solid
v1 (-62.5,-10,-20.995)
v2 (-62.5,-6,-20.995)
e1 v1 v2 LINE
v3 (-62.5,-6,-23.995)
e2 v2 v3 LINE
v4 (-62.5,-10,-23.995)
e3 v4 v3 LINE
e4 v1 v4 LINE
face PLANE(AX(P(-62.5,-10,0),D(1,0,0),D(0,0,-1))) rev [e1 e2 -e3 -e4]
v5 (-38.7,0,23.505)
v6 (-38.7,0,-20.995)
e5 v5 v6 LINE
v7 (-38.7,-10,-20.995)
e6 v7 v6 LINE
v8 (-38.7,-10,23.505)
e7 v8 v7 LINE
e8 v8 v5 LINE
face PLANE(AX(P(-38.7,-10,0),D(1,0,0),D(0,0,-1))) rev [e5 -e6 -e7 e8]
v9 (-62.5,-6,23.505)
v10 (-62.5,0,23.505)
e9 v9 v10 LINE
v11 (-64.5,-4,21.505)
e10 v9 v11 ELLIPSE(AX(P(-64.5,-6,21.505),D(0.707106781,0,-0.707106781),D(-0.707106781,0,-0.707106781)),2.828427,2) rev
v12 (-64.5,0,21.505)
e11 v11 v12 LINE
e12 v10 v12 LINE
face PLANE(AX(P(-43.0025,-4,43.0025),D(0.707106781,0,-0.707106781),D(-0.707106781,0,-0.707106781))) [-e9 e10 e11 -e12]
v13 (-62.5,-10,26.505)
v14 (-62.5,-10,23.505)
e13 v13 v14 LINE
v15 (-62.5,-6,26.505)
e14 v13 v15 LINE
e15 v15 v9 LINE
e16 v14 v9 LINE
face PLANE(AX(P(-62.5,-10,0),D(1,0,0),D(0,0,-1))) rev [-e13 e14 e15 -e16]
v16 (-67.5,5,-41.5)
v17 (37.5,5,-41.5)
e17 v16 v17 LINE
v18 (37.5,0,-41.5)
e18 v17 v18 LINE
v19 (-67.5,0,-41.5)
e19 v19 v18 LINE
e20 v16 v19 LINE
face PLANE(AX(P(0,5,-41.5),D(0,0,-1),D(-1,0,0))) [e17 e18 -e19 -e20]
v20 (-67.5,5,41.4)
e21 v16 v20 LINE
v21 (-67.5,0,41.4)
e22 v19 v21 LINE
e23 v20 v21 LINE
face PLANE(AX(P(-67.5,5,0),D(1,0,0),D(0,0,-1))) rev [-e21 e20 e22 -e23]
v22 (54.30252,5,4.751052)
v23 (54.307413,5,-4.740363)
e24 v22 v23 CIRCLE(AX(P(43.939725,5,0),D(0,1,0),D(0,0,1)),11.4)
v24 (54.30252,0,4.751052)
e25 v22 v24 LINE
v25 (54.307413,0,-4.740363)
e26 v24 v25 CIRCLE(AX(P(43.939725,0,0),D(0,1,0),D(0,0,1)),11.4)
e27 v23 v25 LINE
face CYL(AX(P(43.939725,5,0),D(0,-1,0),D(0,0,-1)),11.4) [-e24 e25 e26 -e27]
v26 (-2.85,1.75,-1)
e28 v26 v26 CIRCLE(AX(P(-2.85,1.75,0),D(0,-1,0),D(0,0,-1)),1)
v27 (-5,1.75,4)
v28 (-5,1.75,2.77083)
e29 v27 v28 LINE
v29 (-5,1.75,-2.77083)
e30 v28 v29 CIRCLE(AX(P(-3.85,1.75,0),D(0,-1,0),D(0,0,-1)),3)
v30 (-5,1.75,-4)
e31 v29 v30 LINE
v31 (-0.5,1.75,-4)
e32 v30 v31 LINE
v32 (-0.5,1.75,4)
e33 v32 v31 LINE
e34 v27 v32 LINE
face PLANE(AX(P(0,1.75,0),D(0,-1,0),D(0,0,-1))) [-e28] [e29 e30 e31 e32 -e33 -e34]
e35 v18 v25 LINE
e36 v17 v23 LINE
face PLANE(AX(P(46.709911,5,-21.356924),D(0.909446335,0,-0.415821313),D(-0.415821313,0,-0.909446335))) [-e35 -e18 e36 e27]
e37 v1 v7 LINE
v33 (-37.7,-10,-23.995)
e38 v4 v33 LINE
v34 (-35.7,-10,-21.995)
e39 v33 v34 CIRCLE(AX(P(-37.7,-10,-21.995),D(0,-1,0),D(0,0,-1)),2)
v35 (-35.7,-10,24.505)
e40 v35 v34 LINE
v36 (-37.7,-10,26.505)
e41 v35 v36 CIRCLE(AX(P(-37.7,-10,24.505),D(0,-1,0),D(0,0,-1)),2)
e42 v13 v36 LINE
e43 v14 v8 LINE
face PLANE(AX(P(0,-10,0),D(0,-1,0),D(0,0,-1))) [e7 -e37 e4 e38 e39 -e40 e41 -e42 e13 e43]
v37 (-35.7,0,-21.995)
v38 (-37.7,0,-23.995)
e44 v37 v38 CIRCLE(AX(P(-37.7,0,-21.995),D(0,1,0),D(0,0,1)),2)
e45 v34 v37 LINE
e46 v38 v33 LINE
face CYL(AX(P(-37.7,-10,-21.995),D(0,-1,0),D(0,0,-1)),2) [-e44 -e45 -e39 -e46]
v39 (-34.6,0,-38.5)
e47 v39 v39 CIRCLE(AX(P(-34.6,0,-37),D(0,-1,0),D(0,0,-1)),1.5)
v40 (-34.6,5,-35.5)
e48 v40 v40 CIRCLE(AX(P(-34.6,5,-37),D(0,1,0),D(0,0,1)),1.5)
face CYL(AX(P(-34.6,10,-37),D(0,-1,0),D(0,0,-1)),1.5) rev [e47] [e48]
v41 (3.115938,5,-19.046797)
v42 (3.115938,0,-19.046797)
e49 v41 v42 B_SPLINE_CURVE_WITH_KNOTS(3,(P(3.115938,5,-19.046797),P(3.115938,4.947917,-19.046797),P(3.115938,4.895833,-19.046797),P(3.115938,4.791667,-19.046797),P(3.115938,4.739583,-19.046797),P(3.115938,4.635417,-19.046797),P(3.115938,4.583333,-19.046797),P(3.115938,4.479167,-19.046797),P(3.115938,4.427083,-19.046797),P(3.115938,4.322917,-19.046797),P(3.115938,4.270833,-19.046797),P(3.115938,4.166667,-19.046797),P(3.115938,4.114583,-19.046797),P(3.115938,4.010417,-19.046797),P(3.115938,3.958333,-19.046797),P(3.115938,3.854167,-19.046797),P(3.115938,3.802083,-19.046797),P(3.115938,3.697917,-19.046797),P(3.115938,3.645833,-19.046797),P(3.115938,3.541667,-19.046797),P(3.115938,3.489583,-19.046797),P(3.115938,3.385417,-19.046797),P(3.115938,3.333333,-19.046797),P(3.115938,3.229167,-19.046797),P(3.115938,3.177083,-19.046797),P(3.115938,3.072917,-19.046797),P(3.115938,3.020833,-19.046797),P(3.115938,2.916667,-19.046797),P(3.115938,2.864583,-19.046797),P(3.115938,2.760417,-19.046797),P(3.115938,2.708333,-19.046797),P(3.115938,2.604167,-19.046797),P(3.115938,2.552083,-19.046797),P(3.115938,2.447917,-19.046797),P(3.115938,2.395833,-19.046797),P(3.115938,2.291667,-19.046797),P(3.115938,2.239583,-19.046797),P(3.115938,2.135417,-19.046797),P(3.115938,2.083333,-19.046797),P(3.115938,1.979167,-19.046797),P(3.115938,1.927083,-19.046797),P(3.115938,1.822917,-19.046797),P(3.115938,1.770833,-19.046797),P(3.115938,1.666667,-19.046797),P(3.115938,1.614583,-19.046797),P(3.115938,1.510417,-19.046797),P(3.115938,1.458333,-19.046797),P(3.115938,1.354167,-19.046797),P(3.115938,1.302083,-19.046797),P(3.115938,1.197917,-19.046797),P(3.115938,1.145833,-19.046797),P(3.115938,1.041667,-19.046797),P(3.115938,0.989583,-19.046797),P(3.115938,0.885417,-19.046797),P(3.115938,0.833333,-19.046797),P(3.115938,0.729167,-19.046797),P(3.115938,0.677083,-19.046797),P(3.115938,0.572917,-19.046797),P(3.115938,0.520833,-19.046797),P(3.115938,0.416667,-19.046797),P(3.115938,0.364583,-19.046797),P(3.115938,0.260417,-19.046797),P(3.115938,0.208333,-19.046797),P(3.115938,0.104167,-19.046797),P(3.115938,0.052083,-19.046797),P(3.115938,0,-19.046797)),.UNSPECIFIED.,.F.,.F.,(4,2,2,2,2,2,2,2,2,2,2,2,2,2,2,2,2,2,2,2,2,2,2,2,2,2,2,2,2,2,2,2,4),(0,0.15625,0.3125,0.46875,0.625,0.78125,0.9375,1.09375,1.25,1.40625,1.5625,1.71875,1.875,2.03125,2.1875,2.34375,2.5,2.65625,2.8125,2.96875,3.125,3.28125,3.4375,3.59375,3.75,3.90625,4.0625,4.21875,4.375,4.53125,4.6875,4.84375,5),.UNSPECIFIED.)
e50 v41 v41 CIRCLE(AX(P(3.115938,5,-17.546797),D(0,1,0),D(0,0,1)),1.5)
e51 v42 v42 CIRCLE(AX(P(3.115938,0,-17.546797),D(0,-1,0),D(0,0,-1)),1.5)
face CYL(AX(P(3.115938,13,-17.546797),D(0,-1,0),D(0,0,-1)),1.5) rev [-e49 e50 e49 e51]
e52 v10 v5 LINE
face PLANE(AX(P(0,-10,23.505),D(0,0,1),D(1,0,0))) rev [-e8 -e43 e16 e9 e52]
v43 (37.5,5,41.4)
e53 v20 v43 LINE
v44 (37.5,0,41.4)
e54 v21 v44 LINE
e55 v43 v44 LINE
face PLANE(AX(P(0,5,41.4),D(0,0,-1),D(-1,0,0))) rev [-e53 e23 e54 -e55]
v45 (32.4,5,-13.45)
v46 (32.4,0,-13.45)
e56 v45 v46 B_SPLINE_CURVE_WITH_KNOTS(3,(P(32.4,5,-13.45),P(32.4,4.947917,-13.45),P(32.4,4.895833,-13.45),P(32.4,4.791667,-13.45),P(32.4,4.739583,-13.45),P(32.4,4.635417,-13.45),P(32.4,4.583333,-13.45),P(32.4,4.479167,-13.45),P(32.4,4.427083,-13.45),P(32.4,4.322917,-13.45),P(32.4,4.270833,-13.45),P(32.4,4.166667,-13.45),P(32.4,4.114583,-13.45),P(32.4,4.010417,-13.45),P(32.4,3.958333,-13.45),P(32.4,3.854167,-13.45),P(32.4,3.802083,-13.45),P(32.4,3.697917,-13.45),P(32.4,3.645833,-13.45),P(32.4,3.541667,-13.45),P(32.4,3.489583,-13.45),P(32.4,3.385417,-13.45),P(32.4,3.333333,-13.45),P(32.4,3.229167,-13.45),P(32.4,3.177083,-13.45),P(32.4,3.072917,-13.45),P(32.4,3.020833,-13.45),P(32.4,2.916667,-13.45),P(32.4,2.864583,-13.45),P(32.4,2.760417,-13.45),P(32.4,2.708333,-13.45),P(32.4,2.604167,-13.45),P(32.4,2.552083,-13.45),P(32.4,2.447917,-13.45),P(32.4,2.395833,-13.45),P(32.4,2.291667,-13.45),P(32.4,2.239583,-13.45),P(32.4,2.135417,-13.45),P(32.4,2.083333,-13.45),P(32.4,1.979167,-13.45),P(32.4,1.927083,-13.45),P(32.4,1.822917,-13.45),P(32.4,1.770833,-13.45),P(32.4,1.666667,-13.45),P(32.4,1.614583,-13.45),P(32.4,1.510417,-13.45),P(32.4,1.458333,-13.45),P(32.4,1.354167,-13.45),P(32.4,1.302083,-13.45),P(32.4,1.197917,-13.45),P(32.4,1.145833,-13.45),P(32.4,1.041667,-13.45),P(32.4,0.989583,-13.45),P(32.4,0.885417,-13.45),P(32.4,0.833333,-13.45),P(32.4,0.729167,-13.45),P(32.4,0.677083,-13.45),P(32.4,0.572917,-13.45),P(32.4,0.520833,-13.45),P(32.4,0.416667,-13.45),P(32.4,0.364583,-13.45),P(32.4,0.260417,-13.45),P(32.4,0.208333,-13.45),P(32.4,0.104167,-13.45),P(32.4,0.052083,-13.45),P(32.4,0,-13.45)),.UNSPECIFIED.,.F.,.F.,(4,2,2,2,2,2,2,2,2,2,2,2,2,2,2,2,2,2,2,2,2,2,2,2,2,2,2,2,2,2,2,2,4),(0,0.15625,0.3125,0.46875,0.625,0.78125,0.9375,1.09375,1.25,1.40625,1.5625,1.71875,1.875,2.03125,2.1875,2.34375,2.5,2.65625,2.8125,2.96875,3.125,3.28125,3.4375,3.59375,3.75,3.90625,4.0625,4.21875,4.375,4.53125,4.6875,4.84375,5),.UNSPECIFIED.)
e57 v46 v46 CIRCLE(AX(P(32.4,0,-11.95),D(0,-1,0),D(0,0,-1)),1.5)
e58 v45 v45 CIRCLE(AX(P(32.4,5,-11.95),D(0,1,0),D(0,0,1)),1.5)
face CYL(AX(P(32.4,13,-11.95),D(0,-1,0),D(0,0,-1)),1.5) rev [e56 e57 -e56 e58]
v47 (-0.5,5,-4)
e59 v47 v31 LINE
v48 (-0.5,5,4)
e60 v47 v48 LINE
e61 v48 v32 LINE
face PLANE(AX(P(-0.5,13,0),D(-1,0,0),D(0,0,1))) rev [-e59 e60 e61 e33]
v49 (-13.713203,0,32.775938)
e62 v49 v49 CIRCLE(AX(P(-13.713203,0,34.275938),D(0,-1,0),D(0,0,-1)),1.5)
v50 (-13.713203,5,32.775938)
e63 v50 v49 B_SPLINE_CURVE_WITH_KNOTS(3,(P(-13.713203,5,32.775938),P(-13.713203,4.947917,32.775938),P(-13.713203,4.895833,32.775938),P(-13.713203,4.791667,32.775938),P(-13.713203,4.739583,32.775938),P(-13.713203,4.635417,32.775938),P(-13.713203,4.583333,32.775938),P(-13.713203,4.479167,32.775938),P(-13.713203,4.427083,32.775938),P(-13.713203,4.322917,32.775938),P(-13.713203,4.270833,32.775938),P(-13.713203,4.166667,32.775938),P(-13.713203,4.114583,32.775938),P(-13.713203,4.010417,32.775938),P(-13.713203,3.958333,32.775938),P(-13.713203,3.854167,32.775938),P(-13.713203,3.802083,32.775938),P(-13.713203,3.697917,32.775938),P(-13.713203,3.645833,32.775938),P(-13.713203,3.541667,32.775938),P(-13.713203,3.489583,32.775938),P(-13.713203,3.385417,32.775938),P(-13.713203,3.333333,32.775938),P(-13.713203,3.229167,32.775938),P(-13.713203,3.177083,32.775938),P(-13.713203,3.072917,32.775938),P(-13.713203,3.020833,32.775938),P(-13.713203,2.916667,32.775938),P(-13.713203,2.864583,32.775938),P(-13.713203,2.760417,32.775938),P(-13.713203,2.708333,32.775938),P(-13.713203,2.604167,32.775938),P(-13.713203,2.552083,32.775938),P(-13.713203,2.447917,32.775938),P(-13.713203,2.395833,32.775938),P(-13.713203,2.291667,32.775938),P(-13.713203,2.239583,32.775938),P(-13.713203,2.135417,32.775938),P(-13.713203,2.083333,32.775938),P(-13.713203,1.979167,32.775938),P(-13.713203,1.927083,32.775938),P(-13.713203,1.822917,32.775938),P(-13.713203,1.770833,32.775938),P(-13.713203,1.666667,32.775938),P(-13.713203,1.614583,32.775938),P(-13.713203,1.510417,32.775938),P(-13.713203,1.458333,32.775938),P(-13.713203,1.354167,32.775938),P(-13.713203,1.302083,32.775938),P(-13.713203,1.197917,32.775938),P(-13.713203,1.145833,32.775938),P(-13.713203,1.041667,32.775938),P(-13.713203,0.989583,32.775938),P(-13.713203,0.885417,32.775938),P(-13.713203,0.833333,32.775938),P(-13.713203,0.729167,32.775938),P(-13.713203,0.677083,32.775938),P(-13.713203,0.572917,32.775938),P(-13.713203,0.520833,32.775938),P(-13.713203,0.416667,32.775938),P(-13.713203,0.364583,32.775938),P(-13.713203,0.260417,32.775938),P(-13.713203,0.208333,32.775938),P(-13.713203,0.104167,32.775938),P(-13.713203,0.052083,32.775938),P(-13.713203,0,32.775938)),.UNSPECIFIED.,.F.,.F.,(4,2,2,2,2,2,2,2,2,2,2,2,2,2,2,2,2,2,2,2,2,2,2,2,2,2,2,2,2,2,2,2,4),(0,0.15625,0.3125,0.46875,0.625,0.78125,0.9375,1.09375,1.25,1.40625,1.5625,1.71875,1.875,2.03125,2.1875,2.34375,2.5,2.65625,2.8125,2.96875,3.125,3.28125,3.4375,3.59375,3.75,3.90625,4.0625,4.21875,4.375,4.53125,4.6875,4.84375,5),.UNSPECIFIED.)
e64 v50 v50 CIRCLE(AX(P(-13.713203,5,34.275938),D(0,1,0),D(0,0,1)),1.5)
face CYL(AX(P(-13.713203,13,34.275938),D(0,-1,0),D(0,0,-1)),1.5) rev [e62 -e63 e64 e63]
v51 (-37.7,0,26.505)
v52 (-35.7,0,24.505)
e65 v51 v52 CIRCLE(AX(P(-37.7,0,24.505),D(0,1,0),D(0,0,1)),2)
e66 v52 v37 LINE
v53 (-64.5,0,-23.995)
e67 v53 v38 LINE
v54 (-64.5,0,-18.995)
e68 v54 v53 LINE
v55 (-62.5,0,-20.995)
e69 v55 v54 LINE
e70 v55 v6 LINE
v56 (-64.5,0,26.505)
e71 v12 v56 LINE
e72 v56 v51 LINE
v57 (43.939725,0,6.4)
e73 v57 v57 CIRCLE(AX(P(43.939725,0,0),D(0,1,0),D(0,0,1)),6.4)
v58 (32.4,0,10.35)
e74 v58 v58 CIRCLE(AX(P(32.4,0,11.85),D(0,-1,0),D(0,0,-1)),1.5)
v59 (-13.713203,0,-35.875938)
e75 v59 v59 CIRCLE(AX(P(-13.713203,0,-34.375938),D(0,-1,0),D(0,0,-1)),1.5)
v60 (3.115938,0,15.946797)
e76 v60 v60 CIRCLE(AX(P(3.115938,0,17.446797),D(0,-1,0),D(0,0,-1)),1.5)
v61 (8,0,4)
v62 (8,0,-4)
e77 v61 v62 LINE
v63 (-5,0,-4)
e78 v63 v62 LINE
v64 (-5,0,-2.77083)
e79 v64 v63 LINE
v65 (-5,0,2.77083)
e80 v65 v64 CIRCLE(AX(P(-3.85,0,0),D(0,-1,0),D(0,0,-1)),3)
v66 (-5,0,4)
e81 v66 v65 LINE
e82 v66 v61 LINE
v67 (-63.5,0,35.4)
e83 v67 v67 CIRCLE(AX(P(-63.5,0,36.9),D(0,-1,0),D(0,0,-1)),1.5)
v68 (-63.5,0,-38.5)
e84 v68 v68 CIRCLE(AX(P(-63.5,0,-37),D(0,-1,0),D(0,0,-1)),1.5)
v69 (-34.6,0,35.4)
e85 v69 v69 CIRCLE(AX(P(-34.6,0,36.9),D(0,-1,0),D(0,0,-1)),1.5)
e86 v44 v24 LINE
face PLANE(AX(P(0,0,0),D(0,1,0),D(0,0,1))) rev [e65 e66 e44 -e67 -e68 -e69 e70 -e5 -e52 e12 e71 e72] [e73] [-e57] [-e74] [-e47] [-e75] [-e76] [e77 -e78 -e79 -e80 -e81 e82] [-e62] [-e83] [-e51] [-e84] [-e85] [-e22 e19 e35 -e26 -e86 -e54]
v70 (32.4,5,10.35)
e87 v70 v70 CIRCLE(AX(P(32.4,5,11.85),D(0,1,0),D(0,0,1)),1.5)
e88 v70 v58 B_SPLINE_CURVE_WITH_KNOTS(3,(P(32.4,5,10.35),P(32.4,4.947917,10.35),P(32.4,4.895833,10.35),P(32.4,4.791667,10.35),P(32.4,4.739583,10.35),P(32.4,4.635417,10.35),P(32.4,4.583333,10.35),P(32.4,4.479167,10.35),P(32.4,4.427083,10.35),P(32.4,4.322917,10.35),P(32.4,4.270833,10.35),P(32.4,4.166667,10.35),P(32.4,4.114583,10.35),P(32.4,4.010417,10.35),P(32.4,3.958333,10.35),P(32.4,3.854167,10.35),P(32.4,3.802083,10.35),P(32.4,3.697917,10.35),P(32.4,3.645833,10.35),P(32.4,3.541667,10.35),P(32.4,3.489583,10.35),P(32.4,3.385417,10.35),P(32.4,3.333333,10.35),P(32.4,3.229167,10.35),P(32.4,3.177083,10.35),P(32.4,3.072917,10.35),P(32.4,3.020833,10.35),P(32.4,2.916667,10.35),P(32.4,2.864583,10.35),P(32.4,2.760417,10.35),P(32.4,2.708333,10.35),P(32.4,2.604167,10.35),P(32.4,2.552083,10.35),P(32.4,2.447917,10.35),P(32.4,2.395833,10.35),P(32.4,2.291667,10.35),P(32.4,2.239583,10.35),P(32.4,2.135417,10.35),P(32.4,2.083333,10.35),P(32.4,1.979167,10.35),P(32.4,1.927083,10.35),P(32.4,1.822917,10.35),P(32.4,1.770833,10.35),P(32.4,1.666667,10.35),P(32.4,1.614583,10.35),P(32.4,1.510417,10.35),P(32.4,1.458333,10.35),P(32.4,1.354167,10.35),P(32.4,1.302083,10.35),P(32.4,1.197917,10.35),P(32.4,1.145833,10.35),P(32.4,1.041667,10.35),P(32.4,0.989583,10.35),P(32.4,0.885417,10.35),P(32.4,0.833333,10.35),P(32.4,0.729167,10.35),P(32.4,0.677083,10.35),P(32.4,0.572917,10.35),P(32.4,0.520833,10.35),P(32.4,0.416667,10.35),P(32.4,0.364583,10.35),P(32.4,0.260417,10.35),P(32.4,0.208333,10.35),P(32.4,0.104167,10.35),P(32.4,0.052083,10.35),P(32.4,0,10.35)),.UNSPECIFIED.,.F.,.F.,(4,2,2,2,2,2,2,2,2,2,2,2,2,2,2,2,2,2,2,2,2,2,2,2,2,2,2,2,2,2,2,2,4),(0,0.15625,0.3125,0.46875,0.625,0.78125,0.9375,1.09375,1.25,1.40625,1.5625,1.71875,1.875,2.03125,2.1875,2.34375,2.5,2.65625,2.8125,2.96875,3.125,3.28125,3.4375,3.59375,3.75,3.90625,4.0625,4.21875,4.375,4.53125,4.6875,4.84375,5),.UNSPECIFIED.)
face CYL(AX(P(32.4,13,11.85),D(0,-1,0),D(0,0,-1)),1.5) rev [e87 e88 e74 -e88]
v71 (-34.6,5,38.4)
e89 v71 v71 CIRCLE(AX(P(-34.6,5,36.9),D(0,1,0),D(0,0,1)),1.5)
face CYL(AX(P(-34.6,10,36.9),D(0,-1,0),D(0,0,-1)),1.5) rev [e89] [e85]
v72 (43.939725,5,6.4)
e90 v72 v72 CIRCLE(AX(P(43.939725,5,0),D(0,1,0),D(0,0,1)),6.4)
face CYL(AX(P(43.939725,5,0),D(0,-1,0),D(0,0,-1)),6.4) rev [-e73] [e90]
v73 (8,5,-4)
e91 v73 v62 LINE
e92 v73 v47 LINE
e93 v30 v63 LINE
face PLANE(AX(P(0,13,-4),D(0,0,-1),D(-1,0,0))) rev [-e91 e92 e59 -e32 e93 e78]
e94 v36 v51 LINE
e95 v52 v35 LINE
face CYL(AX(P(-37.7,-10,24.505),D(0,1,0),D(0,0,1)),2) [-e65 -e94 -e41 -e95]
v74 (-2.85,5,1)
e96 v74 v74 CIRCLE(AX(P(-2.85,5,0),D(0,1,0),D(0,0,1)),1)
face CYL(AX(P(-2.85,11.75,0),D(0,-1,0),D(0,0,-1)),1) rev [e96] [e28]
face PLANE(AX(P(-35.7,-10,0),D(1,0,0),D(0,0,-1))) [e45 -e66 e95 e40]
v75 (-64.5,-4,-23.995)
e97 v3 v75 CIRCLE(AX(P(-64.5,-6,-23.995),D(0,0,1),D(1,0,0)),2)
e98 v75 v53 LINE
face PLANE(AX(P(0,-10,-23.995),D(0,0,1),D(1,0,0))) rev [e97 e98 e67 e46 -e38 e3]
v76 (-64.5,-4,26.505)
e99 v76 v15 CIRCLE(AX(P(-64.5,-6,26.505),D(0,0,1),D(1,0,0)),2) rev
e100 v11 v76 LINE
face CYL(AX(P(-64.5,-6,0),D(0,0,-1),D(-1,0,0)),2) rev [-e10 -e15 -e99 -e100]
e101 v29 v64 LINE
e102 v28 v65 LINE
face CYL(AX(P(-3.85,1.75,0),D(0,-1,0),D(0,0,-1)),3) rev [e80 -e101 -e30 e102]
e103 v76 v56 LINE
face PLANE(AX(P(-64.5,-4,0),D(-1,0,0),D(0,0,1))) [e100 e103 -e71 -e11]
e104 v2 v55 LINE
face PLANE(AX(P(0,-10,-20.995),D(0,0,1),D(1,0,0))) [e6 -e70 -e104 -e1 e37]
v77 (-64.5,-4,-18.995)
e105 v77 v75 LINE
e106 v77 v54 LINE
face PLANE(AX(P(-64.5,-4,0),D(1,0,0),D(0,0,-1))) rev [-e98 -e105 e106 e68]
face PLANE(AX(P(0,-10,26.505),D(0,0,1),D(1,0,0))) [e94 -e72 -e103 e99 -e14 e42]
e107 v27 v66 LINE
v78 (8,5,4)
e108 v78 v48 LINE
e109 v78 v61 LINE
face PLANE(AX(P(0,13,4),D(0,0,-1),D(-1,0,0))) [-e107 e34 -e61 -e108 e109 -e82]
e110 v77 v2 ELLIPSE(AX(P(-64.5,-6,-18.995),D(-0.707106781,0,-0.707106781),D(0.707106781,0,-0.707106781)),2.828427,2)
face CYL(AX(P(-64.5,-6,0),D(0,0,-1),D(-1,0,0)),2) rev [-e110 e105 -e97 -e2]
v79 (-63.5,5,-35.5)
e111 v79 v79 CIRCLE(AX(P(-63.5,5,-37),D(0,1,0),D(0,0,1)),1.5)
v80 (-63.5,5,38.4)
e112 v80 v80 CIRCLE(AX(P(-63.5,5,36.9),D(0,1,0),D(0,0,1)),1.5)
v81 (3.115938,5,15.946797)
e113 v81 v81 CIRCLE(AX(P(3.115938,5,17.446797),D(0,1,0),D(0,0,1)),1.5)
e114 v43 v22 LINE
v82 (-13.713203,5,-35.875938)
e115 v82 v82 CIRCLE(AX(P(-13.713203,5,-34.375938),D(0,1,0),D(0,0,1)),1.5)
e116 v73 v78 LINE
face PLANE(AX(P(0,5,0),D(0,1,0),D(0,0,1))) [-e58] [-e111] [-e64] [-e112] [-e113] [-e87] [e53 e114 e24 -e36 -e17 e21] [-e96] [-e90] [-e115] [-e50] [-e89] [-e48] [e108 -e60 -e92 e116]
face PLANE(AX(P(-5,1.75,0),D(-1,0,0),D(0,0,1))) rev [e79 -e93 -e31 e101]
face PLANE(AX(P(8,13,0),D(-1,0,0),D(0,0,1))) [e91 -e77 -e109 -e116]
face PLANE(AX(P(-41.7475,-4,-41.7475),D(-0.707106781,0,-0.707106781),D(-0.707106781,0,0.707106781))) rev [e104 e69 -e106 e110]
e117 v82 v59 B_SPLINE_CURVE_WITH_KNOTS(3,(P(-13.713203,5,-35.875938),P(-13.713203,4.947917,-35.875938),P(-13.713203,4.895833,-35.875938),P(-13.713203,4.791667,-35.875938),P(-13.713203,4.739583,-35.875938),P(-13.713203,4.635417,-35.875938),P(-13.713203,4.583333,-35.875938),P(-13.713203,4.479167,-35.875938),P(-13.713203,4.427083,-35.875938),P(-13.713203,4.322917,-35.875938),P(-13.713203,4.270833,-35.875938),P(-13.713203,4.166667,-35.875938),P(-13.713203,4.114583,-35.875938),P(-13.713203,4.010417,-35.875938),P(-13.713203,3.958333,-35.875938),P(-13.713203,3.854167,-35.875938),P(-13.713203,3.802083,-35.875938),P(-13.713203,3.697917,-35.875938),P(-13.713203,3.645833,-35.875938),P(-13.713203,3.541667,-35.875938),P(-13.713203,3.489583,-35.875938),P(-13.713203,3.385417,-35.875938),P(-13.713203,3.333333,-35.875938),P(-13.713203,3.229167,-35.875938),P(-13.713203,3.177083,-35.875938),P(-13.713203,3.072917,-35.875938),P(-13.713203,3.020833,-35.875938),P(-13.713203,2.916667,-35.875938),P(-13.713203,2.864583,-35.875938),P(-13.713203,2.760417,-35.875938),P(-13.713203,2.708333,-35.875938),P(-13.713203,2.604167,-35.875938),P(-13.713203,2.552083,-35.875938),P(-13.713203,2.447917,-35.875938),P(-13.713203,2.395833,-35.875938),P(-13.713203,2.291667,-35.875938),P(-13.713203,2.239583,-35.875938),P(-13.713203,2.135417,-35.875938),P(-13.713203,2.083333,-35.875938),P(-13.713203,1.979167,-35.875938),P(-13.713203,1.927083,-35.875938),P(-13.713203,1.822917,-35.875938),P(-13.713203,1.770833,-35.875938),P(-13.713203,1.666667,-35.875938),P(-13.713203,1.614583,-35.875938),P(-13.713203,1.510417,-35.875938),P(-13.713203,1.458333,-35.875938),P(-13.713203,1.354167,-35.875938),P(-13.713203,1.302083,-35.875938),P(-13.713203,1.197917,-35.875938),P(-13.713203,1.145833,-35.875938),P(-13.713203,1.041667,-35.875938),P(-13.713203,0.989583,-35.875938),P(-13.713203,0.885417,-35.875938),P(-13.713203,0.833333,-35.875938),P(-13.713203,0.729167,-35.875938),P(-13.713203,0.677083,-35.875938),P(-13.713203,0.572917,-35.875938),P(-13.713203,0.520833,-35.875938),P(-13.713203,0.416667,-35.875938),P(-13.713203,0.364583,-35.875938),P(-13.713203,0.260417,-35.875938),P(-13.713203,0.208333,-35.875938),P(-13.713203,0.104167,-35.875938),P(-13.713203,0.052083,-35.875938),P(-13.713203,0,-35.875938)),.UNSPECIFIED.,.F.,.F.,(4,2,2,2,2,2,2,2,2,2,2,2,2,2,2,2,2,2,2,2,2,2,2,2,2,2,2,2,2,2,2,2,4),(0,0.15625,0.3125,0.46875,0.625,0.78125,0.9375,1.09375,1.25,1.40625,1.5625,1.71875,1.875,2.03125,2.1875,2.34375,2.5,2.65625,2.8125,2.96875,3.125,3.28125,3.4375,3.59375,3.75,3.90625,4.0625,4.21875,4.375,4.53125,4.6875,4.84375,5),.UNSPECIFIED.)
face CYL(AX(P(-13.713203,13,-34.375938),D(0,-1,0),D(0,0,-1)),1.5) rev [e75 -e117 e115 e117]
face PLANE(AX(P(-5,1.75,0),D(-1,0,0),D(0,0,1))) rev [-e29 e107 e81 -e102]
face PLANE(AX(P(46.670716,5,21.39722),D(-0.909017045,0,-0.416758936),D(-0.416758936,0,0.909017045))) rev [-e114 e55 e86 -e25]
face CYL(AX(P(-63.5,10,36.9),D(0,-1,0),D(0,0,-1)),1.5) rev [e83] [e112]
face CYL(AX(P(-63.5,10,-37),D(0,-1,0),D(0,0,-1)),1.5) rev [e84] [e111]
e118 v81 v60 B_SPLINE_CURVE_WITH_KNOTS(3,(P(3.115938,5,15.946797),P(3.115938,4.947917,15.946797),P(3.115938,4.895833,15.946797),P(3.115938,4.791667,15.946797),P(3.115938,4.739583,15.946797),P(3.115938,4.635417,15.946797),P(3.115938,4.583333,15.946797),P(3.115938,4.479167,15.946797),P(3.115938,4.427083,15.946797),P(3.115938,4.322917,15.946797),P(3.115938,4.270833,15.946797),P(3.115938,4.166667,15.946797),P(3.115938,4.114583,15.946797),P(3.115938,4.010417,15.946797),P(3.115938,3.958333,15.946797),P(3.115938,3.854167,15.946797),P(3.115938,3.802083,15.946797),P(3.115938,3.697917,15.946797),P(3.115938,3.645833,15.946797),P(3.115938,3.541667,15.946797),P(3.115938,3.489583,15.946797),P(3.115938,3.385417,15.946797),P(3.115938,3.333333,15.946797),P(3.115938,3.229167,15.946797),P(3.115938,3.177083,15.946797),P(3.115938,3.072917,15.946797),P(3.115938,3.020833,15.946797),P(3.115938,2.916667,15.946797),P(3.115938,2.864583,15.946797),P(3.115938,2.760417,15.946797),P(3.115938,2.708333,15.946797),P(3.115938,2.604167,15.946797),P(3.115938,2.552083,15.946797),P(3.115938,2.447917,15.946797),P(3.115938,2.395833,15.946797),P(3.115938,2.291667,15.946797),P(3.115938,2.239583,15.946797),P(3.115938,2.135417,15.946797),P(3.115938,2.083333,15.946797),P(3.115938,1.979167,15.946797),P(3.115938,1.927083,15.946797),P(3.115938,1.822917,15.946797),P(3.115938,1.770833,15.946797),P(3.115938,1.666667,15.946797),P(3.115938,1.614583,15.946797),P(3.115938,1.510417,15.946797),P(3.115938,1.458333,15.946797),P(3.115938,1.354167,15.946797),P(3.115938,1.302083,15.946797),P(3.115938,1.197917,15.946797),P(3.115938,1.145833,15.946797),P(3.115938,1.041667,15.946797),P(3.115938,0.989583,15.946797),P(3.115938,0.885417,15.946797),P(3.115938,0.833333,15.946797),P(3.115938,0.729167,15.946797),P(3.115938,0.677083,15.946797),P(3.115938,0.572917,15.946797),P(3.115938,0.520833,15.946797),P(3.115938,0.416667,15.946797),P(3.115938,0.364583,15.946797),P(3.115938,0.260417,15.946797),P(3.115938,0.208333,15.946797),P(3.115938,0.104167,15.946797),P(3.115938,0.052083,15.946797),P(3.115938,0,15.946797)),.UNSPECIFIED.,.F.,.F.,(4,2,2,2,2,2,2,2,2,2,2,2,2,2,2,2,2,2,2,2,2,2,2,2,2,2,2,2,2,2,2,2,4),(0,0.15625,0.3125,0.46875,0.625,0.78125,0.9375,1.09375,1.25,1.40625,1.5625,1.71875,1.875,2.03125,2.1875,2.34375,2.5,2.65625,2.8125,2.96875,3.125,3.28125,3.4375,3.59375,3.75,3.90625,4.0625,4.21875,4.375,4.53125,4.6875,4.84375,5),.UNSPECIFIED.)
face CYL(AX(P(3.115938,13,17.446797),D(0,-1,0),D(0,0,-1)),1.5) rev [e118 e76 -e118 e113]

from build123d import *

# Parameters (mm, degrees)
SKETCH1_R           = 6.4
BOSS_EXTRUDE1_DEPTH = 5
SKETCH7_R           = 1.5
CUT_EXTRUDE4_DEPTH  = 10
BOSS_EXTRUDE2_DEPTH = 10
BOSS_EXTRUDE3_DEPTH = 4
FILLET1_R           = 2
FILLET2_R           = 2
SKETCH12_R          = 1.5
CUT_EXTRUDE5_DEPTH  = 13
SKETCH13_W          = 8.5
SKETCH13_H          = 8
CUT_EXTRUDE6_DEPTH  = 13
SKETCH13_3_R        = 3
SKETCH13_3_W        = 13
SKETCH13_3_H        = 8
CUT_EXTRUDE7_DEPTH  = 1.75
SKETCH15_R          = 1
CUT_EXTRUDE9_DEPTH  = 10


with BuildPart() as part:
    # Sketch1 → Boss-Extrude1 (new body)
    with BuildSketch(Plane(origin=(0, 0, 0), x_dir=(1, 0, 0), z_dir=(0, 1, 0))):
        with BuildLine():
            ThreePointArc((54.302519507, -4.751051874), (55.339723673, -0.00587799), (54.307413406, 4.740362963))
            Line((54.307413406, 4.740362963), (37.5, 41.5))
            Line((37.5, 41.5), (-67.5, 41.5))
            Line((-67.5, 41.5), (-67.5, -41.4))
            Line((-67.5, -41.4), (37.5, -41.4))
            Line((37.5, -41.4), (54.302519507, -4.751051874))
        make_face()
        with Locations(Location((43.939725188, 0, 0), (0, 0, 270))):
            Circle(SKETCH1_R, mode=Mode.SUBTRACT)
    extrude(amount=BOSS_EXTRUDE1_DEPTH)

    # Sketch7 → Cut-Extrude4 (cut)
    with BuildSketch(Plane.XZ):
        with Locations(Location((-34.6, 36.9, 0), (0, 0, 270))):
            Circle(SKETCH7_R)
        with Locations(Location((-63.5, 36.9, 0), (0, 0, 270))):
            Circle(SKETCH7_R)
        with Locations(Location((-63.5, -37, 0), (0, 0, 270))):
            Circle(SKETCH7_R)
        with Locations(Location((-34.6, -37, 0), (0, 0, 270))):
            Circle(SKETCH7_R)
    extrude(amount=-CUT_EXTRUDE4_DEPTH, mode=Mode.SUBTRACT)

    # Sketch9 → Boss-Extrude2 (add)
    with BuildSketch(Plane.XZ):
        Polygon((-35.7, 26.505), (-62.5, 26.505), (-62.5, 23.505), (-38.7, 23.505), (-38.7, -20.995), (-62.5, -20.995), (-62.5, -23.995), (-35.7, -23.995), align=None)
    extrude(amount=BOSS_EXTRUDE2_DEPTH)

    # Sketch9<3> → Boss-Extrude3 (add)
    with BuildSketch(Plane.XZ):
        Polygon((-62.5, 26.505), (-64.5, 26.505), (-64.5, 21.505), (-62.5, 23.505), align=None)
        Polygon((-64.5, -18.995), (-64.5, -23.995), (-62.5, -23.995), (-62.5, -20.995), align=None)
    extrude(amount=BOSS_EXTRUDE3_DEPTH)

    # Fillet1
    fillet1_edges = [part.edges().sort_by_distance(p)[0] for p in [
        (-62.5, -4, 25.005),
        (-62.5, -4, -22.495),
    ]]
    fillet(fillet1_edges, radius=FILLET1_R - 0.0001)  # a hair under: the kernel refuses the full size

    # Fillet2
    fillet2_edges = [part.edges().sort_by_distance(p)[0] for p in [
        (-35.7, -5, 26.505),
        (-35.7, -5, -23.995),
    ]]
    fillet(fillet2_edges, radius=FILLET2_R)

    # Sketch12 → Cut-Extrude5 (cut)
    with BuildSketch(Plane.XZ):
        with Locations(Location((32.4, 11.85, 0), (0, 0, 270))):
            Circle(SKETCH12_R)
        with Locations(Location((32.4, -11.95, 0), (0, 0, 270))):
            Circle(SKETCH12_R)
        with Locations(Location((3.115937957, -17.546796564, 0), (0, 0, 270))):
            Circle(SKETCH12_R)
        with Locations(Location((-13.713203436, -34.375937957, 0), (0, 0, 270))):
            Circle(SKETCH12_R)
        with Locations(Location((3.115937957, 17.446796564, 0), (0, 0, 270))):
            Circle(SKETCH12_R)
        with Locations(Location((-13.713203436, 34.275937957, 0), (0, 0, 270))):
            Circle(SKETCH12_R)
    extrude(amount=-CUT_EXTRUDE5_DEPTH, mode=Mode.SUBTRACT)

    # Sketch13 → Cut-Extrude6 (cut)
    with BuildSketch(Plane.XZ):
        with Locations((3.75, 0)):
            Rectangle(SKETCH13_W, SKETCH13_H)
    extrude(amount=-CUT_EXTRUDE6_DEPTH, mode=Mode.SUBTRACT)

    # Sketch13<3> → Cut-Extrude7 (cut)
    with BuildSketch(Plane.XZ):
        with Locations((-3.85, 0)):
            Circle(SKETCH13_3_R)
        with Locations((1.5, 0)):
            Rectangle(SKETCH13_3_W, SKETCH13_3_H)
    extrude(amount=-CUT_EXTRUDE7_DEPTH, mode=Mode.SUBTRACT)

    # Sketch15 → Cut-Extrude9 (cut)
    with BuildSketch(Plane.XZ.offset(-1.75)):
        with Locations(Location((-2.85, 0, 0), (0, 0, 270))):
            Circle(SKETCH15_R)
    extrude(amount=-CUT_EXTRUDE9_DEPTH, mode=Mode.SUBTRACT)


solid = part.part
